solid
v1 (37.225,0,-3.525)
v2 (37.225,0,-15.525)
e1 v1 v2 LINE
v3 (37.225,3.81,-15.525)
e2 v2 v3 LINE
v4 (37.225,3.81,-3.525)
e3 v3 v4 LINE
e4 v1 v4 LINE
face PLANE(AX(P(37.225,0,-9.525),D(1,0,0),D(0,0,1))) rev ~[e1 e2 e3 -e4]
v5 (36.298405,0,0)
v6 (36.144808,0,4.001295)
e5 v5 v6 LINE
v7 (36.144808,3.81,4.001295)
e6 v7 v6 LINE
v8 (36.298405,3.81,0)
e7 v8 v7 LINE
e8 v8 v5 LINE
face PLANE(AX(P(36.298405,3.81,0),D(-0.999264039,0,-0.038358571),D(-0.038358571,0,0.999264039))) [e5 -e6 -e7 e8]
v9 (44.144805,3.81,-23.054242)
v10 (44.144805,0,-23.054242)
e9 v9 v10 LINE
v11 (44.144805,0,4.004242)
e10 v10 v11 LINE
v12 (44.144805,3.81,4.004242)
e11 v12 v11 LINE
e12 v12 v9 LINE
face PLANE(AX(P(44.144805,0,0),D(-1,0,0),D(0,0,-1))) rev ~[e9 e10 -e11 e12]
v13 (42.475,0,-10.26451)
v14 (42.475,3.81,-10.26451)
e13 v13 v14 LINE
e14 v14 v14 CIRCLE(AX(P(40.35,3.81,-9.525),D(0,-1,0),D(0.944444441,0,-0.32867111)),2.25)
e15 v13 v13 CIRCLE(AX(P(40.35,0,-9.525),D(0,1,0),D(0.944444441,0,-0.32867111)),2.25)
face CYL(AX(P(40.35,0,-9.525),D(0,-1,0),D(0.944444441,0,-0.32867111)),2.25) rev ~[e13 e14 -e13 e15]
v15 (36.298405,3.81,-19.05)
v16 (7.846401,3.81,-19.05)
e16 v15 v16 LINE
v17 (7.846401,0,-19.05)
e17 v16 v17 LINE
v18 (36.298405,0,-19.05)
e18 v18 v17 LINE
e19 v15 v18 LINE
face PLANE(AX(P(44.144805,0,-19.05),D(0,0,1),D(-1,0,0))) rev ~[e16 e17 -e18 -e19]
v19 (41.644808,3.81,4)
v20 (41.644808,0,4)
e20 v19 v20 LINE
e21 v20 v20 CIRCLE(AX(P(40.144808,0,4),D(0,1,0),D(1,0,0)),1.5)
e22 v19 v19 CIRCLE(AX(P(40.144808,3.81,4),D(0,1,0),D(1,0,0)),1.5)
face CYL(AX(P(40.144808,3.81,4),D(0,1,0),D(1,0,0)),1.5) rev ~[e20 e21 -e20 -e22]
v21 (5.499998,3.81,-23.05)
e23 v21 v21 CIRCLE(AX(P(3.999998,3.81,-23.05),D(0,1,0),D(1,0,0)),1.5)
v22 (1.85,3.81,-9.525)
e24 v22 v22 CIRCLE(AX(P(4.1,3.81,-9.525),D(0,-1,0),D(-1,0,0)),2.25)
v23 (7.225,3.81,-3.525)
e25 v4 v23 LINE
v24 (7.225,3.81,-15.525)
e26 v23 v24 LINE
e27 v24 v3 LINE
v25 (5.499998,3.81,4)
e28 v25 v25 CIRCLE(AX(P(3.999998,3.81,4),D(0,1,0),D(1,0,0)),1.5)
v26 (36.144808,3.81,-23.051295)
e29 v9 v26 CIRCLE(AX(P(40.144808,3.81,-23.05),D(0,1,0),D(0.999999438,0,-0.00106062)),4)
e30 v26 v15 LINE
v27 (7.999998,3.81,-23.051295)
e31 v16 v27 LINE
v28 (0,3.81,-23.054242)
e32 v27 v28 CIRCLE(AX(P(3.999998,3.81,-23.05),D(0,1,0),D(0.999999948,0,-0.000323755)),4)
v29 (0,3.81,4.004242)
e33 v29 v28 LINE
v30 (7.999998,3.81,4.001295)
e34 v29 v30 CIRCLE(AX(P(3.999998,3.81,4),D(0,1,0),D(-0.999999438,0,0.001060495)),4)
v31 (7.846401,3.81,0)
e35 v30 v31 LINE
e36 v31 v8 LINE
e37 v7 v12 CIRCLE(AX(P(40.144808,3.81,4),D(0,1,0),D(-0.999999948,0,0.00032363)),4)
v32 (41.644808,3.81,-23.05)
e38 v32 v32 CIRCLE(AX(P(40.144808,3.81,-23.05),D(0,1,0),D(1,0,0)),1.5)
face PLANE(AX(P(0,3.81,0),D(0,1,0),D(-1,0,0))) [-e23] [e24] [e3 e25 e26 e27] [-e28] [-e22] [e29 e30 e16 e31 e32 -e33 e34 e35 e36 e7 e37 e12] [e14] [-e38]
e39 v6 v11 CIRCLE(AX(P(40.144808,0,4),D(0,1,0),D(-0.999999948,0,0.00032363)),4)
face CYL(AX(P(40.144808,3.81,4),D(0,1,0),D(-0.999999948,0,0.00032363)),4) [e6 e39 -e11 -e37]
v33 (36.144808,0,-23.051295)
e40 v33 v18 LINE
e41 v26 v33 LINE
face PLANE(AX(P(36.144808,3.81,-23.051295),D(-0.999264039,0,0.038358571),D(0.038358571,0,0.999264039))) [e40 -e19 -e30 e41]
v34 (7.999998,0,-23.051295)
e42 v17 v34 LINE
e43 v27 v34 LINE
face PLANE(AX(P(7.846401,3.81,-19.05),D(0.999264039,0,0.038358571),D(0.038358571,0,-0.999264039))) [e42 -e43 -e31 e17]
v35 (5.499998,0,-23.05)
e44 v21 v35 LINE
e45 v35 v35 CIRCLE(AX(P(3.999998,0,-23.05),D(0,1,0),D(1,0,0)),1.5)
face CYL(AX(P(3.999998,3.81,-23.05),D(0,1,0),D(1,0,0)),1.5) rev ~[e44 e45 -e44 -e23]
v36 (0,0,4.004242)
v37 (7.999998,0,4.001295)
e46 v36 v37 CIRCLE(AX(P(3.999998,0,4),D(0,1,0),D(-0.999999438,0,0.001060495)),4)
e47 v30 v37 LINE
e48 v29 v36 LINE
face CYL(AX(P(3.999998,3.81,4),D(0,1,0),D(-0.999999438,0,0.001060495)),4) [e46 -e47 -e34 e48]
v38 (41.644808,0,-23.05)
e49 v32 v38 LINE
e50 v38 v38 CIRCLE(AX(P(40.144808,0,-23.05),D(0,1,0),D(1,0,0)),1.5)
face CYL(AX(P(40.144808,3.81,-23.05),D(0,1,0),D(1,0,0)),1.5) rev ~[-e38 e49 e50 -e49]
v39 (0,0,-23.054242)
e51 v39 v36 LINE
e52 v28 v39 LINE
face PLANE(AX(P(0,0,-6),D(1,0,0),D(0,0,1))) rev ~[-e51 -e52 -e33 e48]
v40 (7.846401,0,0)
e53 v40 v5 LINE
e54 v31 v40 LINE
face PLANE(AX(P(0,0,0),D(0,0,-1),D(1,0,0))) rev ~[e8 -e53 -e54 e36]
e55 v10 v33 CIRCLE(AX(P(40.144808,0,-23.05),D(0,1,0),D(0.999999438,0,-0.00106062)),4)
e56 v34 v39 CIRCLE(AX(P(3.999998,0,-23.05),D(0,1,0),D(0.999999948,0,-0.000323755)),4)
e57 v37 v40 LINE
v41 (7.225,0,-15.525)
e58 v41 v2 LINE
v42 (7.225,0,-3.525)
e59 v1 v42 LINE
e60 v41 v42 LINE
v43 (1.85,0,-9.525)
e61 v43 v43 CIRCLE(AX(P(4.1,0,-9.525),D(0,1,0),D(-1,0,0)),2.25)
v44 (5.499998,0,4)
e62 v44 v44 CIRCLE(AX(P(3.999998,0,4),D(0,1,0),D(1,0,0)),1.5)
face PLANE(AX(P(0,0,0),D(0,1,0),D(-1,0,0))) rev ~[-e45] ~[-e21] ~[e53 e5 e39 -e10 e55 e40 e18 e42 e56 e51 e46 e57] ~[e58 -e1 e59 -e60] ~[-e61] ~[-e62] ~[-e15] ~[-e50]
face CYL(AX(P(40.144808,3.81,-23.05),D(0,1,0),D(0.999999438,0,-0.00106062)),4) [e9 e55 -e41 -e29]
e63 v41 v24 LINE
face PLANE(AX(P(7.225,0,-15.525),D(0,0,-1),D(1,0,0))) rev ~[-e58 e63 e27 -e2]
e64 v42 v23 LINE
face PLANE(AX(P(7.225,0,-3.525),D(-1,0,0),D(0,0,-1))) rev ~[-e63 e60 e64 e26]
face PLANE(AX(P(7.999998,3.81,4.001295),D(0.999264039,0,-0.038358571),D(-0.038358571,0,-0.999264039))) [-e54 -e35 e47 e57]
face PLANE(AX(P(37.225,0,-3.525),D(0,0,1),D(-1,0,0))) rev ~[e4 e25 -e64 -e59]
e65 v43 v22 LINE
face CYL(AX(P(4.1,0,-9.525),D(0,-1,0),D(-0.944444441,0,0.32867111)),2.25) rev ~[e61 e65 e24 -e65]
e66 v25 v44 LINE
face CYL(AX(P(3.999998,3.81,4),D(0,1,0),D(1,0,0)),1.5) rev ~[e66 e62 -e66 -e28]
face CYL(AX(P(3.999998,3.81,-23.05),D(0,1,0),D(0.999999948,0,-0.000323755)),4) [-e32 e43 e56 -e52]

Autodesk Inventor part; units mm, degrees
ref_plane "YZ Plane" through (0, 0, 0) normal (1, 0, 0) x (0, 1, 0)
ref_plane "XZ Plane" through (0, 0, 0) normal (0, 1, 0) x (-1, 0, 0)
ref_plane "XY Plane" through (0, 0, 0) normal (0, 0, 1) x (1, 0, 0)
sketch "Sketch3" plane through (0, 0, 0) normal (0, 1, 0) x (-1, 0, 0)
  line L0 (0.305195, 0) -> (-44.144805, 0)
  line L1 (-44.144805, 0) -> (-44.144805, -19.05)
  line L2 (-44.144805, -19.05) -> (0.305195, -19.05)
  line L3 (0.305195, -19.05) -> (0.305195, 0)
  arc A0 (-5.25, -6.73951) -> (-5.25, -5.26049) centre (-3.125, -6) ccw
  circle A1 centre (-3.125, -6) radius 2.25
  arc A2 (35.25, -5.26049) -> (35.25, -6.73951) centre (33.125, -6) ccw
  circle A3 centre (33.125, -6) radius 2.25
  line L4 (33.125, -6) -> (-3.125, -6)
  line L5 (0, -12) -> (0, 0)
  line L6 (30, -12) -> (0, -12)
  line L7 (0, -12) -> (0, 0)
  line L8 (0, 0) -> (30, 0)
  line L9 (30, 0) -> (30, -12)
  line L10 (30, -12) -> (0, 0) construction
  line L11 (0, -12) -> (30, 0) construction
  arc A4 (-42.475, -10.26451) -> (-42.475, -8.78549) centre (-40.35, -9.525) ccw
  circle A5 centre (-40.35, -9.525) radius 2.25
  arc A6 (-1.975, -8.78549) -> (-1.975, -10.26451) centre (-4.1, -9.525) ccw
  circle A7 centre (-4.1, -9.525) radius 2.25
  line L12 (-4.1, -9.525) -> (-40.35, -9.525)
  line L13 (-37.225, -15.525) -> (-37.225, -3.525)
  line L14 (-7.225, -15.525) -> (-37.225, -15.525)
  line L15 (-37.225, -15.525) -> (-37.225, -3.525)
  line L16 (-37.225, -3.525) -> (-7.225, -3.525)
  line L17 (-7.225, -3.525) -> (-7.225, -15.525)
  line L18 (-7.225, -15.525) -> (-37.225, -3.525) construction
  line L19 (-37.225, -15.525) -> (-7.225, -3.525) construction
  point P0 (15, -6)
  point P1 (-22.225, -9.525)
  point P2 (-4.875952, -7.413035)
  point P3 (-5.25, -6.73951)
  point P4 (-2.349048, -8.111965)
  point P5 (-1.975, -10.26451)
  point P6 (0.305195, -12)
  dimension "d12" = 4.5
  dimension "d13" = 4.5
  dimension "d17" = 4.5
  dimension "d18" = 4.5
  dimension "d9" = 44.45
  dimension "d10" = 19.05
  dimension "d11" = 36.25
  dimension "d14" = 30
  dimension "d15" = 12
  dimension "d16" = 36.25
  dimension "d19" = 30
  dimension "d20" = 12
extrude "Extrusion2" add sketch "Sketch3" along normal blind 3.81 contours L5 L6 L3 L2 L1 L0 | A0 A6 A1
sketch "Sketch4" plane through (0, 3.81, 0) normal (0, 1, 0) x (1, 0, 0)
  line L0 (0, 12) -> (0, 0)
  line L1 (-0.305195, 19.05) -> (-0.305195, 12)
  line L2 (0, 12) -> (-0.305195, 12)
  line L3 (-0.305195, 12) -> (-0.305195, 19.05)
  line L4 (-0.305195, 19.05) -> (0, 19.05)
  line L5 (0, 19.05) -> (0, 12)
extrude "Extrusion3" cut sketch "Sketch4" against normal blind 3.81
sketch "Sketch5" plane through (0, 3.81, 0) normal (0, 1, 0) x (1, 0, 0)
  line L0 (44.144805, 19.05) -> (0, 19.05)
  line L1 (22.072403, 19.05) -> (22.072403, 0)
  line L2 (0, 0) -> (44.144805, 0)
  line L3 (22.072403, 9.525) -> (0, 9.525)
  line L4 (0, 19.05) -> (0, 0)
  circle A0 centre (3.999998, -4) radius 4
  circle A1 centre (3.999998, -4) radius 1.5
  line L5 (0, 0) -> (44.144805, 0)
  line L6 (0, -4.004242) -> (0, 0)
  line L7 (0, 0) -> (7.846401, 0)
  line L8 (7.846401, 0) -> (7.999998, -4.001295)
  circle A2 centre (3.999998, 23.05) radius 4
  circle A3 centre (3.999998, 23.05) radius 1.5
  line L9 (0, 23.054242) -> (0, 19.05)
  line L10 (0, 19.05) -> (7.846401, 19.05)
  line L11 (7.846401, 19.05) -> (7.999998, 23.051295)
  line L12 (44.144805, 19.05) -> (44.144805, 0)
  circle A4 centre (40.144808, -4) radius 4
  circle A5 centre (40.144808, -4) radius 1.5
  line L13 (44.144805, -4.004242) -> (44.144805, 0)
  line L14 (44.144805, 0) -> (36.298405, 0)
  line L15 (36.298405, 0) -> (36.144808, -4.001295)
  circle A6 centre (40.144808, 23.05) radius 4
  circle A7 centre (40.144808, 23.05) radius 1.5
  line L16 (44.144805, 23.054242) -> (44.144805, 19.05)
  line L17 (44.144805, 19.05) -> (36.298405, 19.05)
  line L18 (36.298405, 19.05) -> (36.144808, 23.051295)
  point P0 (44.144805, 9.525)
  point P1 (7.846401, 0)
  dimension "d25" = 8
  dimension "d26" = 3
sketch "Sketch5 outline for Extrusion4" plane through (0, 3.81, 0) normal (0, 1, 0) x (1, 0, 0)
  line L0 (44.144805, -4.004242) -> (44.144805, 0)
  arc A0 (36.144808, -4.001295) -> (44.144805, -4.004242) centre (40.144808, -4) ccw
  line L1 (44.144805, 0) -> (36.298405, 0)
  line L2 (36.298405, 0) -> (36.144808, -4.001295)
  circle A1 centre (40.144808, -4) radius 1.5
  line L3 (36.298405, 19.05) -> (44.144805, 19.05)
  line L4 (36.144808, 23.051295) -> (36.298405, 19.05)
  line L5 (44.144805, 19.05) -> (44.144805, 23.054242)
  arc A2 (44.144805, 23.054242) -> (36.144808, 23.051295) centre (40.144808, 23.05) ccw
  circle A3 centre (40.144808, 23.05) radius 1.5
  line L6 (0, 0) -> (0, -4.004242)
  line L7 (7.846401, 0) -> (0, 0)
  arc A4 (0, -4.004242) -> (7.999998, -4.001295) centre (3.999998, -4) ccw
  line L8 (7.999998, -4.001295) -> (7.846401, 0)
  circle A5 centre (3.999998, -4) radius 1.5
  line L9 (7.846401, 19.05) -> (7.999998, 23.051295)
  line L10 (0, 19.05) -> (7.846401, 19.05)
  arc A6 (7.999998, 23.051295) -> (0, 23.054242) centre (3.999998, 23.05) ccw
  line L11 (0, 23.054242) -> (0, 19.05)
  circle A7 centre (3.999998, 23.05) radius 1.5
extrude "Extrusion4" add sketch "Sketch5 outline for Extrusion4" against normal blind 3.81
sketch "Sketch6" plane through (0, 3.81, 0) normal (0, 1, 0) x (1, 0, 0)
  line L0 (0, -7.9375) -> (44.144805, -7.9375)
  line L1 (44.144805, -7.9375) -> (44.144805, 26.9875)
  line L2 (44.144805, 26.9875) -> (0, 26.9875)
  line L3 (0, 26.9875) -> (0, -7.9375)
  circle A0 centre (3.999998, 23.05) radius 1.5
  circle A1 centre (3.999998, 23.05) radius 1.5
  circle A2 centre (3.999998, -4) radius 1.5
  circle A3 centre (3.999998, -4) radius 1.5
  circle A4 centre (40.144808, -4) radius 1.5
  circle A5 centre (40.144808, -4) radius 1.5
  circle A6 centre (40.144808, 23.05) radius 1.5
  circle A7 centre (40.144808, 23.05) radius 1.5
properties part number "motor mount v2"
